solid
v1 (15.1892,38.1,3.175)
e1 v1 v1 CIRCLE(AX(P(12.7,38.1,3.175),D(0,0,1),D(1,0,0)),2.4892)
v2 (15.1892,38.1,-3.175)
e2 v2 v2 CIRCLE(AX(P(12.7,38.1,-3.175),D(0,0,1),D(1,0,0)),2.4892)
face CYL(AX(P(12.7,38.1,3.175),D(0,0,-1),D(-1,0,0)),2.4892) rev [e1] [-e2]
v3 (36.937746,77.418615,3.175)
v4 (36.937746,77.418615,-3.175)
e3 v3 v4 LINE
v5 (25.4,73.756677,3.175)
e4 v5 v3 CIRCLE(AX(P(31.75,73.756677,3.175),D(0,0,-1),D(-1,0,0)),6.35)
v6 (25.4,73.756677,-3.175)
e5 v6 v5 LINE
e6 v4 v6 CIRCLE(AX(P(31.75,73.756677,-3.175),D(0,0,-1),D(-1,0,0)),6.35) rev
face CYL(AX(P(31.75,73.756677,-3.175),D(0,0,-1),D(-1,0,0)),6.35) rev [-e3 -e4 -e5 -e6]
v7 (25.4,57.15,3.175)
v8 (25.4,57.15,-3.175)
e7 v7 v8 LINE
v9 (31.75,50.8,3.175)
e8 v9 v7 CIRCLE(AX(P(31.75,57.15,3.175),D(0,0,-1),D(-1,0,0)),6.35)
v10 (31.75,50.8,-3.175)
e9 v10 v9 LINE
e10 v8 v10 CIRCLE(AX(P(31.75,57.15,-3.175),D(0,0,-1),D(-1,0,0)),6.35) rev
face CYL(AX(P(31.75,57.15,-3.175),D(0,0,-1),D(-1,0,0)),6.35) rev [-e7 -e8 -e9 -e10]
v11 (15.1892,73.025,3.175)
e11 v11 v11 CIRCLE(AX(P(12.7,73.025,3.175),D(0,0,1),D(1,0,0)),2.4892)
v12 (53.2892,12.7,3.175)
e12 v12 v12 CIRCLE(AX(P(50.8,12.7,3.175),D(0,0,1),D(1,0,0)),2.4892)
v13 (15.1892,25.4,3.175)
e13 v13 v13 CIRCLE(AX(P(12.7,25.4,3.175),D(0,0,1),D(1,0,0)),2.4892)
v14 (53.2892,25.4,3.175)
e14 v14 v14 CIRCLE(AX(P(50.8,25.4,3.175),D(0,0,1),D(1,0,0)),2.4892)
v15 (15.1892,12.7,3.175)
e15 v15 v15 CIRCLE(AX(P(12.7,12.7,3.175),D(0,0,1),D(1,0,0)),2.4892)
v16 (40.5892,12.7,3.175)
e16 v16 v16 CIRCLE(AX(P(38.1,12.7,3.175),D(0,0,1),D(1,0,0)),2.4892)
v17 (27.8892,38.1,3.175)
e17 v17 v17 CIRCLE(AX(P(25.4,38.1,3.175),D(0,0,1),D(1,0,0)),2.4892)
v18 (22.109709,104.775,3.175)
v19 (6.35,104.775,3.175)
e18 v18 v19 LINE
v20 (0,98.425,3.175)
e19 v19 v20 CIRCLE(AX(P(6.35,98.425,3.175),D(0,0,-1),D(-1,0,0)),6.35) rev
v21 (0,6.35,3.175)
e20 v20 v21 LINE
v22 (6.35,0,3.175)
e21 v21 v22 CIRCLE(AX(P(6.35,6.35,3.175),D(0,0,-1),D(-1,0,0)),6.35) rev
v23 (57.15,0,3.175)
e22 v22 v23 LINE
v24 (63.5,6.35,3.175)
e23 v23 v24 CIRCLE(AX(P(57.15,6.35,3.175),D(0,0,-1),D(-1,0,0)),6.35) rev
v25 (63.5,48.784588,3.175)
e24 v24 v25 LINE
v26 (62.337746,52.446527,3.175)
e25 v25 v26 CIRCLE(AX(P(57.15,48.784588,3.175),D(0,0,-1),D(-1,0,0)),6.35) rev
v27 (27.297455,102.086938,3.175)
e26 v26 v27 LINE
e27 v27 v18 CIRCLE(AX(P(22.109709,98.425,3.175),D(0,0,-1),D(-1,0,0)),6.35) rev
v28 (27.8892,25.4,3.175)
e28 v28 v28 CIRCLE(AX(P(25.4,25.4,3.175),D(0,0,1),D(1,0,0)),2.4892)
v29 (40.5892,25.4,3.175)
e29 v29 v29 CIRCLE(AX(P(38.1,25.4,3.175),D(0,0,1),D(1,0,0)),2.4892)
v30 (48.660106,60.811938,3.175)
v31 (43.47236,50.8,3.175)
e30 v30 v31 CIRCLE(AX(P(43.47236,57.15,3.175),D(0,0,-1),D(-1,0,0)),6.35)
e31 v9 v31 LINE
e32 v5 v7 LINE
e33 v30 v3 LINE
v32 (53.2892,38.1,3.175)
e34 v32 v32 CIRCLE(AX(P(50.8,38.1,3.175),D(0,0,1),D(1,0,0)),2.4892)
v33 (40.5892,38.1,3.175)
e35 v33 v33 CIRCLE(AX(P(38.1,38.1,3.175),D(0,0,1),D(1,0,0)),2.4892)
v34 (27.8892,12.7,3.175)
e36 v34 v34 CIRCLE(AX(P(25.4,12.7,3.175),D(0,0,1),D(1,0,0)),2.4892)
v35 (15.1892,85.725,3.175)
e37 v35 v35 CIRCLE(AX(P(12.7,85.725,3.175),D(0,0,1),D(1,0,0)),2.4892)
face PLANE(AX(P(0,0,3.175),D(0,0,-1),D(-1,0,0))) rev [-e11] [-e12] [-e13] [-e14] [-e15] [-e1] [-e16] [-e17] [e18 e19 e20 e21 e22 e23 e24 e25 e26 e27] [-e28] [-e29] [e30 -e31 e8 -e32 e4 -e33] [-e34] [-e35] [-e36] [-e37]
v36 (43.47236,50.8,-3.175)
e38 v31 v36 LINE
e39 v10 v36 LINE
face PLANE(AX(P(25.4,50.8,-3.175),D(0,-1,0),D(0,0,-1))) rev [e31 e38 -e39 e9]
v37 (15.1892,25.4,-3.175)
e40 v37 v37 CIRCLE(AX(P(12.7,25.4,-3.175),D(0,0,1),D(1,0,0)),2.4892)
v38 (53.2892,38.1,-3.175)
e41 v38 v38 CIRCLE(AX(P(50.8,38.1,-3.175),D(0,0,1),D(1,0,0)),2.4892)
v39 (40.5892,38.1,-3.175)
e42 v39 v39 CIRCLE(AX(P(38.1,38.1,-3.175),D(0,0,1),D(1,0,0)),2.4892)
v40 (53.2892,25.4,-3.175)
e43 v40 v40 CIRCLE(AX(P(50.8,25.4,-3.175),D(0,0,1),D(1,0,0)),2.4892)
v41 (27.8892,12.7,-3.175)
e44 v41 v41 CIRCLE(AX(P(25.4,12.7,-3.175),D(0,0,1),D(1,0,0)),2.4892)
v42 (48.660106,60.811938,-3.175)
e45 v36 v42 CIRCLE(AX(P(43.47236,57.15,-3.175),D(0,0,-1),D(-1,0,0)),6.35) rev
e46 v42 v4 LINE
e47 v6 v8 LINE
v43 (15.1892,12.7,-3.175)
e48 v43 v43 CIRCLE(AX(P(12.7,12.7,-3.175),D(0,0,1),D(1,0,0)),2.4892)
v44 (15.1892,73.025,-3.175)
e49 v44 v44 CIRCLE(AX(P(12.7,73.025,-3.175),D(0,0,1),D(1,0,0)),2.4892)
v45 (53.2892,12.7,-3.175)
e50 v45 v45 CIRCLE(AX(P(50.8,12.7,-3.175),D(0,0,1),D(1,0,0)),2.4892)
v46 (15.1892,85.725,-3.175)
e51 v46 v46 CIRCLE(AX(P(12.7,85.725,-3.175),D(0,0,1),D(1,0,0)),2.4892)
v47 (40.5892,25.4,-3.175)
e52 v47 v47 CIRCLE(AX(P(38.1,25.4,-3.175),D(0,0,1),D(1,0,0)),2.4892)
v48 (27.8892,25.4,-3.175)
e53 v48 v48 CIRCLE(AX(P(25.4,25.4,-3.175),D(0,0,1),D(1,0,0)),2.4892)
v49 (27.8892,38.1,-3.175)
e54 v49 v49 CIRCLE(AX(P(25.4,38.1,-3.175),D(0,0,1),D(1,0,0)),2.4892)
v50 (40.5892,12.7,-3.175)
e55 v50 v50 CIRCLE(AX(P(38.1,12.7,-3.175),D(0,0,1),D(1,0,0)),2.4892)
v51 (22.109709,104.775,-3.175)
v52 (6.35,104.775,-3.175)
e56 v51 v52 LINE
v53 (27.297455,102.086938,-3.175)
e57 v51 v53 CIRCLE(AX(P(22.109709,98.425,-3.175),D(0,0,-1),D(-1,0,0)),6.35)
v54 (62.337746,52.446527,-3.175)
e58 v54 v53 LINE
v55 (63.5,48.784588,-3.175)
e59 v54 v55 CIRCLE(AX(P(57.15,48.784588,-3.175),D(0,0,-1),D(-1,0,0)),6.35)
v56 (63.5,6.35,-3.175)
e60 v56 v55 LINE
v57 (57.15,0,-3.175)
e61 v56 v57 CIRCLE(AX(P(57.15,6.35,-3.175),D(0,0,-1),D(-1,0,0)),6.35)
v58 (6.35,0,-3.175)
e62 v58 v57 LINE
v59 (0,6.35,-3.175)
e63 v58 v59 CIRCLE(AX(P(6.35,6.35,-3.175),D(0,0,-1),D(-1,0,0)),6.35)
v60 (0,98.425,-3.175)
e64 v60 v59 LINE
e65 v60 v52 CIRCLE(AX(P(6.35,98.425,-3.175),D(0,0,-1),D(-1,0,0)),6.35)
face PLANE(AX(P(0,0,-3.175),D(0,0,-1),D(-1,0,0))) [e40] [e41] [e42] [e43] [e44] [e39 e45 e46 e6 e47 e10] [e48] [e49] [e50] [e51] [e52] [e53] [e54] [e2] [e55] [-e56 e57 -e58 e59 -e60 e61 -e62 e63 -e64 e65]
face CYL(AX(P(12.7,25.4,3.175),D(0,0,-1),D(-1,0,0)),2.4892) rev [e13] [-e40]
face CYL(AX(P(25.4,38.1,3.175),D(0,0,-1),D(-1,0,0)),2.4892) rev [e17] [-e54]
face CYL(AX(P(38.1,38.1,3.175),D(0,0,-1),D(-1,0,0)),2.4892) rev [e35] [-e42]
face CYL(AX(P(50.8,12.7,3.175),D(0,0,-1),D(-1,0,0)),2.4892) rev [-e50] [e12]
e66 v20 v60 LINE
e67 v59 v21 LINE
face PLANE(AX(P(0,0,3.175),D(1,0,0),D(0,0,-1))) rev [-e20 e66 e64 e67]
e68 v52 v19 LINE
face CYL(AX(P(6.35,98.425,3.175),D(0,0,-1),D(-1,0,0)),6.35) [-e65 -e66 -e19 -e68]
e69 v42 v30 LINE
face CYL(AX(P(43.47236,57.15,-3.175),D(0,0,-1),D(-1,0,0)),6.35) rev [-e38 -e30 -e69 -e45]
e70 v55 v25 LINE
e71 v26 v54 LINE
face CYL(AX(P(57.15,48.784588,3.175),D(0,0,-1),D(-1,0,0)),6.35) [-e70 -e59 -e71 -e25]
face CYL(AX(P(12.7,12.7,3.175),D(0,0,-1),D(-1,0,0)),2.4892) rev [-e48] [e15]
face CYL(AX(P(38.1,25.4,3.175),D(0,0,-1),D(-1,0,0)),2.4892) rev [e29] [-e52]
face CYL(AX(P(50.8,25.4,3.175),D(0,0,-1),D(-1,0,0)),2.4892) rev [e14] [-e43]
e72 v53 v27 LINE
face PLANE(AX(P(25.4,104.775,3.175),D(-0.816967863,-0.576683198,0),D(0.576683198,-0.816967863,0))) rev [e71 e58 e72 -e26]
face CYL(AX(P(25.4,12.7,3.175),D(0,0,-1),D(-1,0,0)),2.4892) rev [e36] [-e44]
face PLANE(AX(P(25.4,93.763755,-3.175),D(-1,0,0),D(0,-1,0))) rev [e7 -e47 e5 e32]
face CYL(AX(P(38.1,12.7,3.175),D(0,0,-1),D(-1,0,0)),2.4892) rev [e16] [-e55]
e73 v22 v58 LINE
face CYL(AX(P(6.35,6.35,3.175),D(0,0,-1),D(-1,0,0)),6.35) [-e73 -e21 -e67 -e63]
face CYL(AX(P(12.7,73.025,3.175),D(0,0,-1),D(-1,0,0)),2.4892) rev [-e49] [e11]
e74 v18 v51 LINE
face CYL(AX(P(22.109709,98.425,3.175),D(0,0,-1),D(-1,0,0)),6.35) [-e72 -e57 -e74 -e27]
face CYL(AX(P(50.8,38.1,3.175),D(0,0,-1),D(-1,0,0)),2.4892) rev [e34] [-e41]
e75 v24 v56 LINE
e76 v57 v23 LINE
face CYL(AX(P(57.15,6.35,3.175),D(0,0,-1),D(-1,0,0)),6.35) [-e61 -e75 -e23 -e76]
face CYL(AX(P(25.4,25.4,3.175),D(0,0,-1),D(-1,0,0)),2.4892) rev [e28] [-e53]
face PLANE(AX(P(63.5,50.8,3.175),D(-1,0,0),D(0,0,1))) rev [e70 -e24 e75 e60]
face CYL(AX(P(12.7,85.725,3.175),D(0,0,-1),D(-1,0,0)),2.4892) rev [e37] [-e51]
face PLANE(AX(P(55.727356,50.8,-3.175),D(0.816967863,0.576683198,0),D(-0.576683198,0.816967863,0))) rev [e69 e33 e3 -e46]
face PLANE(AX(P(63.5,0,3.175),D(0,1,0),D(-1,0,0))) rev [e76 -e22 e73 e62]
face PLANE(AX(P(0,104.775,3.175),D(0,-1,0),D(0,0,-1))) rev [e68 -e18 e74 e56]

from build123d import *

# Parameters (mm, degrees)
SKETCH1_R           = 2.4892
BOSS_EXTRUDE1_DEPTH = 3.175
LPATTERN1_START     = -3.175
LPATTERN1_OUTLINE_R = 2.4892
LPATTERN1_DEPTH     = 6.35
CUT_EXTRUDE1_DEPTH  = 123.679962198
FILLET1_R           = 6.35


# Read off the part's stored shape, not the designer's step: LPattern1
with BuildPart() as part:
    # Sketch1 → Boss-Extrude1 (new, symmetric)
    with BuildSketch(Plane.XY):
        Polygon((0, 0), (0, 104.775), (25.4, 104.775), (63.5, 50.8), (63.5, 0), align=None)
        with Locations((12.7, 85.725)):
            Circle(SKETCH1_R, mode=Mode.SUBTRACT)
        with Locations((12.7, 73.025)):
            Circle(SKETCH1_R, mode=Mode.SUBTRACT)
        with Locations((12.7, 12.7)):
            Circle(SKETCH1_R, mode=Mode.SUBTRACT)
    extrude(amount=BOSS_EXTRUDE1_DEPTH, both=True)

    # LPattern1 outline → LPattern1 (cut)
    with BuildSketch(Plane.XY.offset(LPATTERN1_START)):
        with Locations((50.8, 38.1)):
            Circle(LPATTERN1_OUTLINE_R)
        with Locations((38.1, 38.1)):
            Circle(LPATTERN1_OUTLINE_R)
        with Locations((25.4, 38.1)):
            Circle(LPATTERN1_OUTLINE_R)
        with Locations((12.7, 38.1)):
            Circle(LPATTERN1_OUTLINE_R)
        with Locations((50.8, 25.4)):
            Circle(LPATTERN1_OUTLINE_R)
        with Locations((38.1, 25.4)):
            Circle(LPATTERN1_OUTLINE_R)
        with Locations((25.4, 25.4)):
            Circle(LPATTERN1_OUTLINE_R)
        with Locations((12.7, 25.4)):
            Circle(LPATTERN1_OUTLINE_R)
        with Locations((50.8, 12.7)):
            Circle(LPATTERN1_OUTLINE_R)
        with Locations((38.1, 12.7)):
            Circle(LPATTERN1_OUTLINE_R)
        with Locations((25.4, 12.7)):
            Circle(LPATTERN1_OUTLINE_R)
    extrude(amount=LPATTERN1_DEPTH, mode=Mode.SUBTRACT)

    # Sketch2 → Cut-Extrude1 (cut, through all)
    with BuildSketch(Plane.XY.offset(3.175)):
        Polygon((25.4, 93.763754959), (25.4, 50.8), (55.727356441, 50.8), align=None)
    extrude(amount=-CUT_EXTRUDE1_DEPTH, mode=Mode.SUBTRACT)

    # Fillet1
    fillet1_edges = [part.edges().sort_by_distance(p)[0] for p in [
        (55.727356441, 50.8, 0),
        (25.4, 50.8, 0),
        (25.4, 93.763754959, 0),
        (0, 0, 0),
        (0, 104.775, 0),
        (25.4, 104.775, 0),
        (63.5, 50.8, 0),
        (63.5, 0, 0),
    ]]
    fillet(fillet1_edges, radius=FILLET1_R)


solid = part.part
